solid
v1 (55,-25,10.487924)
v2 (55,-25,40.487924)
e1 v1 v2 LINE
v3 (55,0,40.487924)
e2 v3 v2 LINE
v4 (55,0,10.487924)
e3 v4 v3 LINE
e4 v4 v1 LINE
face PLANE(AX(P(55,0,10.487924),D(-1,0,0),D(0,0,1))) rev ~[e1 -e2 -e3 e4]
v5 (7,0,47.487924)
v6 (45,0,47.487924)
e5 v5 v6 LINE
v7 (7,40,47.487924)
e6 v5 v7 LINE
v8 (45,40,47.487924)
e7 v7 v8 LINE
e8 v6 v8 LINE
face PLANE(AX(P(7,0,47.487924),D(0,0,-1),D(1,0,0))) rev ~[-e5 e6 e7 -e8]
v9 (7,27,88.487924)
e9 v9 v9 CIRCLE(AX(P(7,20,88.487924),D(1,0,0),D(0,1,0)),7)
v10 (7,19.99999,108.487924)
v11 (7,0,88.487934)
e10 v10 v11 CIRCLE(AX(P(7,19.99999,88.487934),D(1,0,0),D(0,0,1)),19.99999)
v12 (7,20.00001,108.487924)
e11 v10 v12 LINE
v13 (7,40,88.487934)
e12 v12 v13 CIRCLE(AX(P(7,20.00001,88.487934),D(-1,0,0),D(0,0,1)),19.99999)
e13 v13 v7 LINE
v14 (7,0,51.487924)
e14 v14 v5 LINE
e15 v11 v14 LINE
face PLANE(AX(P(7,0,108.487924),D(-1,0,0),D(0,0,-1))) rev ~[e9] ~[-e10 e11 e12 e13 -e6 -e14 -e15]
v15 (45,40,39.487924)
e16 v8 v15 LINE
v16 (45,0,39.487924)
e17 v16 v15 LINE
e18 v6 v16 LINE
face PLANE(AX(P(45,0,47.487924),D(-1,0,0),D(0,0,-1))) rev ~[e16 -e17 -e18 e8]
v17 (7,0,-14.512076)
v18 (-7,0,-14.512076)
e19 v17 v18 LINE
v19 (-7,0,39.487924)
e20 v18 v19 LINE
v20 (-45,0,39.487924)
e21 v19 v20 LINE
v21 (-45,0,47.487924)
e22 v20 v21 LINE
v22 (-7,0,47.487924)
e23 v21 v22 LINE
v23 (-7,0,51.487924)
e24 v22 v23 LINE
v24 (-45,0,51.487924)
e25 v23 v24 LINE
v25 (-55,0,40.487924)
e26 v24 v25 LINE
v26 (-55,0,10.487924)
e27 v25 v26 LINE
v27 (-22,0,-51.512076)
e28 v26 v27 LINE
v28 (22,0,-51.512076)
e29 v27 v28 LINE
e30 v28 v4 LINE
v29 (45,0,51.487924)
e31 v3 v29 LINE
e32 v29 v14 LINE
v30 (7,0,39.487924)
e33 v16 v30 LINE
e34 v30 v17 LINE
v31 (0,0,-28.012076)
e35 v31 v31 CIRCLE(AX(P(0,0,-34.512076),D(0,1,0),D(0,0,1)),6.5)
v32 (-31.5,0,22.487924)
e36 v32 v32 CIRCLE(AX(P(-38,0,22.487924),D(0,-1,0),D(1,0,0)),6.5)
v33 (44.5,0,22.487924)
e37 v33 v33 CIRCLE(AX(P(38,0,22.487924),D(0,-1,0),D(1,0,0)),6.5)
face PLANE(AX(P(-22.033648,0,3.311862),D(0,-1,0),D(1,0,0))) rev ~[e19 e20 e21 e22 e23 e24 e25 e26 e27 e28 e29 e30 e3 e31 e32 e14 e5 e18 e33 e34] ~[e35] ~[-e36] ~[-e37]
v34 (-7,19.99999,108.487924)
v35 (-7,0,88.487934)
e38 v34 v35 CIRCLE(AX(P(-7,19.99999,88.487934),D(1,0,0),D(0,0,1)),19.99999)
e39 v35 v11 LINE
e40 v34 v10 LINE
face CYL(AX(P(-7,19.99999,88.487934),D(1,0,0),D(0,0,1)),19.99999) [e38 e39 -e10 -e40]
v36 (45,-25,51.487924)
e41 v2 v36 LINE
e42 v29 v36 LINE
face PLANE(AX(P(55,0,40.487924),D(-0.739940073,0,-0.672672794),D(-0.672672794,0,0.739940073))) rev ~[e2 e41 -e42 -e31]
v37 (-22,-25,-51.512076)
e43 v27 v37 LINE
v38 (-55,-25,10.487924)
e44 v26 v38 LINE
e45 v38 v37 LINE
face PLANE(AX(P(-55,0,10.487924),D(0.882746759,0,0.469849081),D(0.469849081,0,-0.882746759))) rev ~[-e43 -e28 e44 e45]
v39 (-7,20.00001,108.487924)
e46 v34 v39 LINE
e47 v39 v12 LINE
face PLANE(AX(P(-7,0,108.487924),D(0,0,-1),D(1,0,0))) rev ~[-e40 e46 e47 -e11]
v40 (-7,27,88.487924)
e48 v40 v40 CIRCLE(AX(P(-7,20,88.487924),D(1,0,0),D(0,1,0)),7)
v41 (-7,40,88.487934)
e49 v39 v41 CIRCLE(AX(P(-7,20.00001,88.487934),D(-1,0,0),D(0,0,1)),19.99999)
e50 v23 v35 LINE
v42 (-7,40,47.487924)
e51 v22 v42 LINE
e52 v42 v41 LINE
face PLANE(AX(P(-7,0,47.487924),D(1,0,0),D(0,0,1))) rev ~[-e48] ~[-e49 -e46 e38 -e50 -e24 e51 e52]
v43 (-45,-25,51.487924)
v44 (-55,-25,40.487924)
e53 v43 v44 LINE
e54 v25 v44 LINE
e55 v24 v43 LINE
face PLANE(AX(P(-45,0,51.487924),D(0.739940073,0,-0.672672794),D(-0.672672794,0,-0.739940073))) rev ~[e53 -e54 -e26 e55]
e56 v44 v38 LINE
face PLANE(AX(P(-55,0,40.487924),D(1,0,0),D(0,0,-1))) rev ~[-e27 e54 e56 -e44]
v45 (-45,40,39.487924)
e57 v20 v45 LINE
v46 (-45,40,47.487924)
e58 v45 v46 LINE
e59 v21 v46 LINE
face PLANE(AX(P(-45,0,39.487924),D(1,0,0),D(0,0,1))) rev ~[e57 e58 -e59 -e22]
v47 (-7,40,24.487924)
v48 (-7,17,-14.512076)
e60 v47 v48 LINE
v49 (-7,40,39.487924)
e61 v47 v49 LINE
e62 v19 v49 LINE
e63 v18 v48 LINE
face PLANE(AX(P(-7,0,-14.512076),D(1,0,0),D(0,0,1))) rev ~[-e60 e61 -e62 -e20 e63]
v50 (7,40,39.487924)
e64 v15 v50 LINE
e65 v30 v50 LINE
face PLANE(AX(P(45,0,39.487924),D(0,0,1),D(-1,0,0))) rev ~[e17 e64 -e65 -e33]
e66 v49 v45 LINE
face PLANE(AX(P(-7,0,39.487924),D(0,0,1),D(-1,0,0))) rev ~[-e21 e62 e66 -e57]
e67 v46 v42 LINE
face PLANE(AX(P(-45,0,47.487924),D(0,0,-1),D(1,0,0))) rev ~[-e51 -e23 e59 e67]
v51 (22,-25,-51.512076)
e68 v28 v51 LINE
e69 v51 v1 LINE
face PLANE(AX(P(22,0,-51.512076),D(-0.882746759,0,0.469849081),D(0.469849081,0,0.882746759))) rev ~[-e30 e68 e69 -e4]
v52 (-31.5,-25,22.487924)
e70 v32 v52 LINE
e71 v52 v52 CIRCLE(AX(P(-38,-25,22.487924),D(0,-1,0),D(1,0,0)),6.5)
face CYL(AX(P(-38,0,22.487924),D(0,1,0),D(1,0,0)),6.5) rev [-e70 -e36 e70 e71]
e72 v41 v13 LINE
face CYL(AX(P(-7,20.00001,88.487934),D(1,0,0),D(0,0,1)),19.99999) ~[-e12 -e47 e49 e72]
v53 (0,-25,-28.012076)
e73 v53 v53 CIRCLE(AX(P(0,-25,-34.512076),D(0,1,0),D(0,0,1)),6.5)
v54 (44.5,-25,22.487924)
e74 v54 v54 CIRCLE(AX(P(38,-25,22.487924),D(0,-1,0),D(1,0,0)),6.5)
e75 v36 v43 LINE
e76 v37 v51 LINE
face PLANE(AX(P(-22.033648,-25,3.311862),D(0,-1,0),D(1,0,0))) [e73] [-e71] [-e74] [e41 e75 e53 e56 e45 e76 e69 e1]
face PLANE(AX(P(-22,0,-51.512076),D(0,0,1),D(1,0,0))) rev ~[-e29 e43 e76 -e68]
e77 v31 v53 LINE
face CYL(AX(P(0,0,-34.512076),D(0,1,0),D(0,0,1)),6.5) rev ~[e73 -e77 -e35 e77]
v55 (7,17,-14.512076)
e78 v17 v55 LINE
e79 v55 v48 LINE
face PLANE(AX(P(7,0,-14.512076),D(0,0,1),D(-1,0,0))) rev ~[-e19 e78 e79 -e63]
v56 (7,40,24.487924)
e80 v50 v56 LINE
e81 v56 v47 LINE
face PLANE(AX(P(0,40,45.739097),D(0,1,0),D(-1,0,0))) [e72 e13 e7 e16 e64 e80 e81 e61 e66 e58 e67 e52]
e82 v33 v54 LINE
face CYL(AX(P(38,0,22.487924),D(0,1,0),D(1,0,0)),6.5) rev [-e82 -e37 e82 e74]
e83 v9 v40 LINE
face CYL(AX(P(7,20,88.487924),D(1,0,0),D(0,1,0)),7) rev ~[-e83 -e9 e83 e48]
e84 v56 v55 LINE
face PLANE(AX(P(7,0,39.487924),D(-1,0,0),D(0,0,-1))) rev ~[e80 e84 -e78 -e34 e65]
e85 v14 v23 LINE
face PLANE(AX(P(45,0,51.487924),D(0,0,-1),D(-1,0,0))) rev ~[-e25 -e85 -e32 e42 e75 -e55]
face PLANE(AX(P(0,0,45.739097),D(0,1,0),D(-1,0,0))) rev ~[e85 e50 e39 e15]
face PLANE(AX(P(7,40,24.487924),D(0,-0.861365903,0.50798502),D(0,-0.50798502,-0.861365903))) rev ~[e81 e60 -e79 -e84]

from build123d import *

# Parameters (mm, degrees)
F0_R     = 6.5
F1_DEPTH = 25
F3_DEPTH = 40
F4_R     = 19.99999
F5_R     = 7
F6_DEPTH = 25


# Not quite as in the source:
# - a fillet or chamfer is up to 0.001 mm smaller than in the source, because OpenCascade refuses the exact size


with BuildPart() as f1:
    # F0 (on Front) → F1 (new body)
    with BuildSketch(Plane.XZ):
        with BuildLine():
            Line((0, -28.0120762104), (0, 51.4879237896))
            Line((0, 51.4879237896), (-45, 51.4879237896))
            Line((-45, 51.4879237896), (-55, 40.4879237896))
            Line((-55, 40.4879237896), (-55, 10.4879237896))
            Line((-55, 10.4879237896), (-22, -51.5120762104))
            Line((-22, -51.5120762104), (0, -51.5120762104))
            Line((0, -51.5120762104), (0, -41.0120762104))
            ThreePointArc((0, -41.0120762104), (-6.5, -34.5120762104), (0, -28.0120762104))
        make_face()
        with Locations((-38, 22.4879237896)):
            Circle(F0_R, mode=Mode.SUBTRACT)
        with BuildLine():
            Line((45, 51.4879237896), (0, 51.4879237896))
            Line((0, 51.4879237896), (0, -28.0120762104))
            ThreePointArc((0, -28.0120762104), (6.5, -34.5120762104), (0, -41.0120762104))
            Line((0, -41.0120762104), (0, -51.5120762104))
            Line((0, -51.5120762104), (22, -51.5120762104))
            Line((22, -51.5120762104), (55, 10.4879237896))
            Line((55, 10.4879237896), (55, 40.4879237896))
            Line((55, 40.4879237896), (45, 51.4879237896))
        make_face()
        with Locations((38, 22.4879237896)):
            Circle(F0_R, mode=Mode.SUBTRACT)
    extrude(amount=F1_DEPTH)

    # F2 (on face) → F3 (join)
    with BuildSketch(Plane(origin=(0, 0, 0), x_dir=(-1, 0, 0), z_dir=(0, 1, 0))):
        Polygon((7, 108.4879237896), (0, 108.4879237896), (-7, 108.4879237896), (-7, 47.4879237896), (-45, 47.4879237896), (-45, 39.4879237896), (-7, 39.4879237896), (-7, -14.5120762104), (0, -14.5120762104), (7, -14.5120762104), (7, 39.4879237896), (45, 39.4879237896), (45, 47.4879237896), (7, 47.4879237896), align=None)
    extrude(amount=F3_DEPTH)

    # F4 (radius 20 in the source; OpenCascade refuses exactly that, so slightly less here)
    f4_edges = [f1.edges().sort_by_distance(p)[0] for p in [
        (0, 0, 108.487924),
        (0, 40, 108.487924),
    ]]
    fillet(f4_edges, radius=F4_R)

    # F5 (on face) → F6 (cut)
    with BuildSketch(Plane.YZ.offset(7)):
        with Locations((20, 88.4879237896)):
            Circle(F5_R)
        Polygon((40, -14.5120762104), (40, 24.4879237896), (17, -14.5120762104), align=None)
    extrude(amount=-F6_DEPTH, mode=Mode.SUBTRACT)


solid = f1.part
